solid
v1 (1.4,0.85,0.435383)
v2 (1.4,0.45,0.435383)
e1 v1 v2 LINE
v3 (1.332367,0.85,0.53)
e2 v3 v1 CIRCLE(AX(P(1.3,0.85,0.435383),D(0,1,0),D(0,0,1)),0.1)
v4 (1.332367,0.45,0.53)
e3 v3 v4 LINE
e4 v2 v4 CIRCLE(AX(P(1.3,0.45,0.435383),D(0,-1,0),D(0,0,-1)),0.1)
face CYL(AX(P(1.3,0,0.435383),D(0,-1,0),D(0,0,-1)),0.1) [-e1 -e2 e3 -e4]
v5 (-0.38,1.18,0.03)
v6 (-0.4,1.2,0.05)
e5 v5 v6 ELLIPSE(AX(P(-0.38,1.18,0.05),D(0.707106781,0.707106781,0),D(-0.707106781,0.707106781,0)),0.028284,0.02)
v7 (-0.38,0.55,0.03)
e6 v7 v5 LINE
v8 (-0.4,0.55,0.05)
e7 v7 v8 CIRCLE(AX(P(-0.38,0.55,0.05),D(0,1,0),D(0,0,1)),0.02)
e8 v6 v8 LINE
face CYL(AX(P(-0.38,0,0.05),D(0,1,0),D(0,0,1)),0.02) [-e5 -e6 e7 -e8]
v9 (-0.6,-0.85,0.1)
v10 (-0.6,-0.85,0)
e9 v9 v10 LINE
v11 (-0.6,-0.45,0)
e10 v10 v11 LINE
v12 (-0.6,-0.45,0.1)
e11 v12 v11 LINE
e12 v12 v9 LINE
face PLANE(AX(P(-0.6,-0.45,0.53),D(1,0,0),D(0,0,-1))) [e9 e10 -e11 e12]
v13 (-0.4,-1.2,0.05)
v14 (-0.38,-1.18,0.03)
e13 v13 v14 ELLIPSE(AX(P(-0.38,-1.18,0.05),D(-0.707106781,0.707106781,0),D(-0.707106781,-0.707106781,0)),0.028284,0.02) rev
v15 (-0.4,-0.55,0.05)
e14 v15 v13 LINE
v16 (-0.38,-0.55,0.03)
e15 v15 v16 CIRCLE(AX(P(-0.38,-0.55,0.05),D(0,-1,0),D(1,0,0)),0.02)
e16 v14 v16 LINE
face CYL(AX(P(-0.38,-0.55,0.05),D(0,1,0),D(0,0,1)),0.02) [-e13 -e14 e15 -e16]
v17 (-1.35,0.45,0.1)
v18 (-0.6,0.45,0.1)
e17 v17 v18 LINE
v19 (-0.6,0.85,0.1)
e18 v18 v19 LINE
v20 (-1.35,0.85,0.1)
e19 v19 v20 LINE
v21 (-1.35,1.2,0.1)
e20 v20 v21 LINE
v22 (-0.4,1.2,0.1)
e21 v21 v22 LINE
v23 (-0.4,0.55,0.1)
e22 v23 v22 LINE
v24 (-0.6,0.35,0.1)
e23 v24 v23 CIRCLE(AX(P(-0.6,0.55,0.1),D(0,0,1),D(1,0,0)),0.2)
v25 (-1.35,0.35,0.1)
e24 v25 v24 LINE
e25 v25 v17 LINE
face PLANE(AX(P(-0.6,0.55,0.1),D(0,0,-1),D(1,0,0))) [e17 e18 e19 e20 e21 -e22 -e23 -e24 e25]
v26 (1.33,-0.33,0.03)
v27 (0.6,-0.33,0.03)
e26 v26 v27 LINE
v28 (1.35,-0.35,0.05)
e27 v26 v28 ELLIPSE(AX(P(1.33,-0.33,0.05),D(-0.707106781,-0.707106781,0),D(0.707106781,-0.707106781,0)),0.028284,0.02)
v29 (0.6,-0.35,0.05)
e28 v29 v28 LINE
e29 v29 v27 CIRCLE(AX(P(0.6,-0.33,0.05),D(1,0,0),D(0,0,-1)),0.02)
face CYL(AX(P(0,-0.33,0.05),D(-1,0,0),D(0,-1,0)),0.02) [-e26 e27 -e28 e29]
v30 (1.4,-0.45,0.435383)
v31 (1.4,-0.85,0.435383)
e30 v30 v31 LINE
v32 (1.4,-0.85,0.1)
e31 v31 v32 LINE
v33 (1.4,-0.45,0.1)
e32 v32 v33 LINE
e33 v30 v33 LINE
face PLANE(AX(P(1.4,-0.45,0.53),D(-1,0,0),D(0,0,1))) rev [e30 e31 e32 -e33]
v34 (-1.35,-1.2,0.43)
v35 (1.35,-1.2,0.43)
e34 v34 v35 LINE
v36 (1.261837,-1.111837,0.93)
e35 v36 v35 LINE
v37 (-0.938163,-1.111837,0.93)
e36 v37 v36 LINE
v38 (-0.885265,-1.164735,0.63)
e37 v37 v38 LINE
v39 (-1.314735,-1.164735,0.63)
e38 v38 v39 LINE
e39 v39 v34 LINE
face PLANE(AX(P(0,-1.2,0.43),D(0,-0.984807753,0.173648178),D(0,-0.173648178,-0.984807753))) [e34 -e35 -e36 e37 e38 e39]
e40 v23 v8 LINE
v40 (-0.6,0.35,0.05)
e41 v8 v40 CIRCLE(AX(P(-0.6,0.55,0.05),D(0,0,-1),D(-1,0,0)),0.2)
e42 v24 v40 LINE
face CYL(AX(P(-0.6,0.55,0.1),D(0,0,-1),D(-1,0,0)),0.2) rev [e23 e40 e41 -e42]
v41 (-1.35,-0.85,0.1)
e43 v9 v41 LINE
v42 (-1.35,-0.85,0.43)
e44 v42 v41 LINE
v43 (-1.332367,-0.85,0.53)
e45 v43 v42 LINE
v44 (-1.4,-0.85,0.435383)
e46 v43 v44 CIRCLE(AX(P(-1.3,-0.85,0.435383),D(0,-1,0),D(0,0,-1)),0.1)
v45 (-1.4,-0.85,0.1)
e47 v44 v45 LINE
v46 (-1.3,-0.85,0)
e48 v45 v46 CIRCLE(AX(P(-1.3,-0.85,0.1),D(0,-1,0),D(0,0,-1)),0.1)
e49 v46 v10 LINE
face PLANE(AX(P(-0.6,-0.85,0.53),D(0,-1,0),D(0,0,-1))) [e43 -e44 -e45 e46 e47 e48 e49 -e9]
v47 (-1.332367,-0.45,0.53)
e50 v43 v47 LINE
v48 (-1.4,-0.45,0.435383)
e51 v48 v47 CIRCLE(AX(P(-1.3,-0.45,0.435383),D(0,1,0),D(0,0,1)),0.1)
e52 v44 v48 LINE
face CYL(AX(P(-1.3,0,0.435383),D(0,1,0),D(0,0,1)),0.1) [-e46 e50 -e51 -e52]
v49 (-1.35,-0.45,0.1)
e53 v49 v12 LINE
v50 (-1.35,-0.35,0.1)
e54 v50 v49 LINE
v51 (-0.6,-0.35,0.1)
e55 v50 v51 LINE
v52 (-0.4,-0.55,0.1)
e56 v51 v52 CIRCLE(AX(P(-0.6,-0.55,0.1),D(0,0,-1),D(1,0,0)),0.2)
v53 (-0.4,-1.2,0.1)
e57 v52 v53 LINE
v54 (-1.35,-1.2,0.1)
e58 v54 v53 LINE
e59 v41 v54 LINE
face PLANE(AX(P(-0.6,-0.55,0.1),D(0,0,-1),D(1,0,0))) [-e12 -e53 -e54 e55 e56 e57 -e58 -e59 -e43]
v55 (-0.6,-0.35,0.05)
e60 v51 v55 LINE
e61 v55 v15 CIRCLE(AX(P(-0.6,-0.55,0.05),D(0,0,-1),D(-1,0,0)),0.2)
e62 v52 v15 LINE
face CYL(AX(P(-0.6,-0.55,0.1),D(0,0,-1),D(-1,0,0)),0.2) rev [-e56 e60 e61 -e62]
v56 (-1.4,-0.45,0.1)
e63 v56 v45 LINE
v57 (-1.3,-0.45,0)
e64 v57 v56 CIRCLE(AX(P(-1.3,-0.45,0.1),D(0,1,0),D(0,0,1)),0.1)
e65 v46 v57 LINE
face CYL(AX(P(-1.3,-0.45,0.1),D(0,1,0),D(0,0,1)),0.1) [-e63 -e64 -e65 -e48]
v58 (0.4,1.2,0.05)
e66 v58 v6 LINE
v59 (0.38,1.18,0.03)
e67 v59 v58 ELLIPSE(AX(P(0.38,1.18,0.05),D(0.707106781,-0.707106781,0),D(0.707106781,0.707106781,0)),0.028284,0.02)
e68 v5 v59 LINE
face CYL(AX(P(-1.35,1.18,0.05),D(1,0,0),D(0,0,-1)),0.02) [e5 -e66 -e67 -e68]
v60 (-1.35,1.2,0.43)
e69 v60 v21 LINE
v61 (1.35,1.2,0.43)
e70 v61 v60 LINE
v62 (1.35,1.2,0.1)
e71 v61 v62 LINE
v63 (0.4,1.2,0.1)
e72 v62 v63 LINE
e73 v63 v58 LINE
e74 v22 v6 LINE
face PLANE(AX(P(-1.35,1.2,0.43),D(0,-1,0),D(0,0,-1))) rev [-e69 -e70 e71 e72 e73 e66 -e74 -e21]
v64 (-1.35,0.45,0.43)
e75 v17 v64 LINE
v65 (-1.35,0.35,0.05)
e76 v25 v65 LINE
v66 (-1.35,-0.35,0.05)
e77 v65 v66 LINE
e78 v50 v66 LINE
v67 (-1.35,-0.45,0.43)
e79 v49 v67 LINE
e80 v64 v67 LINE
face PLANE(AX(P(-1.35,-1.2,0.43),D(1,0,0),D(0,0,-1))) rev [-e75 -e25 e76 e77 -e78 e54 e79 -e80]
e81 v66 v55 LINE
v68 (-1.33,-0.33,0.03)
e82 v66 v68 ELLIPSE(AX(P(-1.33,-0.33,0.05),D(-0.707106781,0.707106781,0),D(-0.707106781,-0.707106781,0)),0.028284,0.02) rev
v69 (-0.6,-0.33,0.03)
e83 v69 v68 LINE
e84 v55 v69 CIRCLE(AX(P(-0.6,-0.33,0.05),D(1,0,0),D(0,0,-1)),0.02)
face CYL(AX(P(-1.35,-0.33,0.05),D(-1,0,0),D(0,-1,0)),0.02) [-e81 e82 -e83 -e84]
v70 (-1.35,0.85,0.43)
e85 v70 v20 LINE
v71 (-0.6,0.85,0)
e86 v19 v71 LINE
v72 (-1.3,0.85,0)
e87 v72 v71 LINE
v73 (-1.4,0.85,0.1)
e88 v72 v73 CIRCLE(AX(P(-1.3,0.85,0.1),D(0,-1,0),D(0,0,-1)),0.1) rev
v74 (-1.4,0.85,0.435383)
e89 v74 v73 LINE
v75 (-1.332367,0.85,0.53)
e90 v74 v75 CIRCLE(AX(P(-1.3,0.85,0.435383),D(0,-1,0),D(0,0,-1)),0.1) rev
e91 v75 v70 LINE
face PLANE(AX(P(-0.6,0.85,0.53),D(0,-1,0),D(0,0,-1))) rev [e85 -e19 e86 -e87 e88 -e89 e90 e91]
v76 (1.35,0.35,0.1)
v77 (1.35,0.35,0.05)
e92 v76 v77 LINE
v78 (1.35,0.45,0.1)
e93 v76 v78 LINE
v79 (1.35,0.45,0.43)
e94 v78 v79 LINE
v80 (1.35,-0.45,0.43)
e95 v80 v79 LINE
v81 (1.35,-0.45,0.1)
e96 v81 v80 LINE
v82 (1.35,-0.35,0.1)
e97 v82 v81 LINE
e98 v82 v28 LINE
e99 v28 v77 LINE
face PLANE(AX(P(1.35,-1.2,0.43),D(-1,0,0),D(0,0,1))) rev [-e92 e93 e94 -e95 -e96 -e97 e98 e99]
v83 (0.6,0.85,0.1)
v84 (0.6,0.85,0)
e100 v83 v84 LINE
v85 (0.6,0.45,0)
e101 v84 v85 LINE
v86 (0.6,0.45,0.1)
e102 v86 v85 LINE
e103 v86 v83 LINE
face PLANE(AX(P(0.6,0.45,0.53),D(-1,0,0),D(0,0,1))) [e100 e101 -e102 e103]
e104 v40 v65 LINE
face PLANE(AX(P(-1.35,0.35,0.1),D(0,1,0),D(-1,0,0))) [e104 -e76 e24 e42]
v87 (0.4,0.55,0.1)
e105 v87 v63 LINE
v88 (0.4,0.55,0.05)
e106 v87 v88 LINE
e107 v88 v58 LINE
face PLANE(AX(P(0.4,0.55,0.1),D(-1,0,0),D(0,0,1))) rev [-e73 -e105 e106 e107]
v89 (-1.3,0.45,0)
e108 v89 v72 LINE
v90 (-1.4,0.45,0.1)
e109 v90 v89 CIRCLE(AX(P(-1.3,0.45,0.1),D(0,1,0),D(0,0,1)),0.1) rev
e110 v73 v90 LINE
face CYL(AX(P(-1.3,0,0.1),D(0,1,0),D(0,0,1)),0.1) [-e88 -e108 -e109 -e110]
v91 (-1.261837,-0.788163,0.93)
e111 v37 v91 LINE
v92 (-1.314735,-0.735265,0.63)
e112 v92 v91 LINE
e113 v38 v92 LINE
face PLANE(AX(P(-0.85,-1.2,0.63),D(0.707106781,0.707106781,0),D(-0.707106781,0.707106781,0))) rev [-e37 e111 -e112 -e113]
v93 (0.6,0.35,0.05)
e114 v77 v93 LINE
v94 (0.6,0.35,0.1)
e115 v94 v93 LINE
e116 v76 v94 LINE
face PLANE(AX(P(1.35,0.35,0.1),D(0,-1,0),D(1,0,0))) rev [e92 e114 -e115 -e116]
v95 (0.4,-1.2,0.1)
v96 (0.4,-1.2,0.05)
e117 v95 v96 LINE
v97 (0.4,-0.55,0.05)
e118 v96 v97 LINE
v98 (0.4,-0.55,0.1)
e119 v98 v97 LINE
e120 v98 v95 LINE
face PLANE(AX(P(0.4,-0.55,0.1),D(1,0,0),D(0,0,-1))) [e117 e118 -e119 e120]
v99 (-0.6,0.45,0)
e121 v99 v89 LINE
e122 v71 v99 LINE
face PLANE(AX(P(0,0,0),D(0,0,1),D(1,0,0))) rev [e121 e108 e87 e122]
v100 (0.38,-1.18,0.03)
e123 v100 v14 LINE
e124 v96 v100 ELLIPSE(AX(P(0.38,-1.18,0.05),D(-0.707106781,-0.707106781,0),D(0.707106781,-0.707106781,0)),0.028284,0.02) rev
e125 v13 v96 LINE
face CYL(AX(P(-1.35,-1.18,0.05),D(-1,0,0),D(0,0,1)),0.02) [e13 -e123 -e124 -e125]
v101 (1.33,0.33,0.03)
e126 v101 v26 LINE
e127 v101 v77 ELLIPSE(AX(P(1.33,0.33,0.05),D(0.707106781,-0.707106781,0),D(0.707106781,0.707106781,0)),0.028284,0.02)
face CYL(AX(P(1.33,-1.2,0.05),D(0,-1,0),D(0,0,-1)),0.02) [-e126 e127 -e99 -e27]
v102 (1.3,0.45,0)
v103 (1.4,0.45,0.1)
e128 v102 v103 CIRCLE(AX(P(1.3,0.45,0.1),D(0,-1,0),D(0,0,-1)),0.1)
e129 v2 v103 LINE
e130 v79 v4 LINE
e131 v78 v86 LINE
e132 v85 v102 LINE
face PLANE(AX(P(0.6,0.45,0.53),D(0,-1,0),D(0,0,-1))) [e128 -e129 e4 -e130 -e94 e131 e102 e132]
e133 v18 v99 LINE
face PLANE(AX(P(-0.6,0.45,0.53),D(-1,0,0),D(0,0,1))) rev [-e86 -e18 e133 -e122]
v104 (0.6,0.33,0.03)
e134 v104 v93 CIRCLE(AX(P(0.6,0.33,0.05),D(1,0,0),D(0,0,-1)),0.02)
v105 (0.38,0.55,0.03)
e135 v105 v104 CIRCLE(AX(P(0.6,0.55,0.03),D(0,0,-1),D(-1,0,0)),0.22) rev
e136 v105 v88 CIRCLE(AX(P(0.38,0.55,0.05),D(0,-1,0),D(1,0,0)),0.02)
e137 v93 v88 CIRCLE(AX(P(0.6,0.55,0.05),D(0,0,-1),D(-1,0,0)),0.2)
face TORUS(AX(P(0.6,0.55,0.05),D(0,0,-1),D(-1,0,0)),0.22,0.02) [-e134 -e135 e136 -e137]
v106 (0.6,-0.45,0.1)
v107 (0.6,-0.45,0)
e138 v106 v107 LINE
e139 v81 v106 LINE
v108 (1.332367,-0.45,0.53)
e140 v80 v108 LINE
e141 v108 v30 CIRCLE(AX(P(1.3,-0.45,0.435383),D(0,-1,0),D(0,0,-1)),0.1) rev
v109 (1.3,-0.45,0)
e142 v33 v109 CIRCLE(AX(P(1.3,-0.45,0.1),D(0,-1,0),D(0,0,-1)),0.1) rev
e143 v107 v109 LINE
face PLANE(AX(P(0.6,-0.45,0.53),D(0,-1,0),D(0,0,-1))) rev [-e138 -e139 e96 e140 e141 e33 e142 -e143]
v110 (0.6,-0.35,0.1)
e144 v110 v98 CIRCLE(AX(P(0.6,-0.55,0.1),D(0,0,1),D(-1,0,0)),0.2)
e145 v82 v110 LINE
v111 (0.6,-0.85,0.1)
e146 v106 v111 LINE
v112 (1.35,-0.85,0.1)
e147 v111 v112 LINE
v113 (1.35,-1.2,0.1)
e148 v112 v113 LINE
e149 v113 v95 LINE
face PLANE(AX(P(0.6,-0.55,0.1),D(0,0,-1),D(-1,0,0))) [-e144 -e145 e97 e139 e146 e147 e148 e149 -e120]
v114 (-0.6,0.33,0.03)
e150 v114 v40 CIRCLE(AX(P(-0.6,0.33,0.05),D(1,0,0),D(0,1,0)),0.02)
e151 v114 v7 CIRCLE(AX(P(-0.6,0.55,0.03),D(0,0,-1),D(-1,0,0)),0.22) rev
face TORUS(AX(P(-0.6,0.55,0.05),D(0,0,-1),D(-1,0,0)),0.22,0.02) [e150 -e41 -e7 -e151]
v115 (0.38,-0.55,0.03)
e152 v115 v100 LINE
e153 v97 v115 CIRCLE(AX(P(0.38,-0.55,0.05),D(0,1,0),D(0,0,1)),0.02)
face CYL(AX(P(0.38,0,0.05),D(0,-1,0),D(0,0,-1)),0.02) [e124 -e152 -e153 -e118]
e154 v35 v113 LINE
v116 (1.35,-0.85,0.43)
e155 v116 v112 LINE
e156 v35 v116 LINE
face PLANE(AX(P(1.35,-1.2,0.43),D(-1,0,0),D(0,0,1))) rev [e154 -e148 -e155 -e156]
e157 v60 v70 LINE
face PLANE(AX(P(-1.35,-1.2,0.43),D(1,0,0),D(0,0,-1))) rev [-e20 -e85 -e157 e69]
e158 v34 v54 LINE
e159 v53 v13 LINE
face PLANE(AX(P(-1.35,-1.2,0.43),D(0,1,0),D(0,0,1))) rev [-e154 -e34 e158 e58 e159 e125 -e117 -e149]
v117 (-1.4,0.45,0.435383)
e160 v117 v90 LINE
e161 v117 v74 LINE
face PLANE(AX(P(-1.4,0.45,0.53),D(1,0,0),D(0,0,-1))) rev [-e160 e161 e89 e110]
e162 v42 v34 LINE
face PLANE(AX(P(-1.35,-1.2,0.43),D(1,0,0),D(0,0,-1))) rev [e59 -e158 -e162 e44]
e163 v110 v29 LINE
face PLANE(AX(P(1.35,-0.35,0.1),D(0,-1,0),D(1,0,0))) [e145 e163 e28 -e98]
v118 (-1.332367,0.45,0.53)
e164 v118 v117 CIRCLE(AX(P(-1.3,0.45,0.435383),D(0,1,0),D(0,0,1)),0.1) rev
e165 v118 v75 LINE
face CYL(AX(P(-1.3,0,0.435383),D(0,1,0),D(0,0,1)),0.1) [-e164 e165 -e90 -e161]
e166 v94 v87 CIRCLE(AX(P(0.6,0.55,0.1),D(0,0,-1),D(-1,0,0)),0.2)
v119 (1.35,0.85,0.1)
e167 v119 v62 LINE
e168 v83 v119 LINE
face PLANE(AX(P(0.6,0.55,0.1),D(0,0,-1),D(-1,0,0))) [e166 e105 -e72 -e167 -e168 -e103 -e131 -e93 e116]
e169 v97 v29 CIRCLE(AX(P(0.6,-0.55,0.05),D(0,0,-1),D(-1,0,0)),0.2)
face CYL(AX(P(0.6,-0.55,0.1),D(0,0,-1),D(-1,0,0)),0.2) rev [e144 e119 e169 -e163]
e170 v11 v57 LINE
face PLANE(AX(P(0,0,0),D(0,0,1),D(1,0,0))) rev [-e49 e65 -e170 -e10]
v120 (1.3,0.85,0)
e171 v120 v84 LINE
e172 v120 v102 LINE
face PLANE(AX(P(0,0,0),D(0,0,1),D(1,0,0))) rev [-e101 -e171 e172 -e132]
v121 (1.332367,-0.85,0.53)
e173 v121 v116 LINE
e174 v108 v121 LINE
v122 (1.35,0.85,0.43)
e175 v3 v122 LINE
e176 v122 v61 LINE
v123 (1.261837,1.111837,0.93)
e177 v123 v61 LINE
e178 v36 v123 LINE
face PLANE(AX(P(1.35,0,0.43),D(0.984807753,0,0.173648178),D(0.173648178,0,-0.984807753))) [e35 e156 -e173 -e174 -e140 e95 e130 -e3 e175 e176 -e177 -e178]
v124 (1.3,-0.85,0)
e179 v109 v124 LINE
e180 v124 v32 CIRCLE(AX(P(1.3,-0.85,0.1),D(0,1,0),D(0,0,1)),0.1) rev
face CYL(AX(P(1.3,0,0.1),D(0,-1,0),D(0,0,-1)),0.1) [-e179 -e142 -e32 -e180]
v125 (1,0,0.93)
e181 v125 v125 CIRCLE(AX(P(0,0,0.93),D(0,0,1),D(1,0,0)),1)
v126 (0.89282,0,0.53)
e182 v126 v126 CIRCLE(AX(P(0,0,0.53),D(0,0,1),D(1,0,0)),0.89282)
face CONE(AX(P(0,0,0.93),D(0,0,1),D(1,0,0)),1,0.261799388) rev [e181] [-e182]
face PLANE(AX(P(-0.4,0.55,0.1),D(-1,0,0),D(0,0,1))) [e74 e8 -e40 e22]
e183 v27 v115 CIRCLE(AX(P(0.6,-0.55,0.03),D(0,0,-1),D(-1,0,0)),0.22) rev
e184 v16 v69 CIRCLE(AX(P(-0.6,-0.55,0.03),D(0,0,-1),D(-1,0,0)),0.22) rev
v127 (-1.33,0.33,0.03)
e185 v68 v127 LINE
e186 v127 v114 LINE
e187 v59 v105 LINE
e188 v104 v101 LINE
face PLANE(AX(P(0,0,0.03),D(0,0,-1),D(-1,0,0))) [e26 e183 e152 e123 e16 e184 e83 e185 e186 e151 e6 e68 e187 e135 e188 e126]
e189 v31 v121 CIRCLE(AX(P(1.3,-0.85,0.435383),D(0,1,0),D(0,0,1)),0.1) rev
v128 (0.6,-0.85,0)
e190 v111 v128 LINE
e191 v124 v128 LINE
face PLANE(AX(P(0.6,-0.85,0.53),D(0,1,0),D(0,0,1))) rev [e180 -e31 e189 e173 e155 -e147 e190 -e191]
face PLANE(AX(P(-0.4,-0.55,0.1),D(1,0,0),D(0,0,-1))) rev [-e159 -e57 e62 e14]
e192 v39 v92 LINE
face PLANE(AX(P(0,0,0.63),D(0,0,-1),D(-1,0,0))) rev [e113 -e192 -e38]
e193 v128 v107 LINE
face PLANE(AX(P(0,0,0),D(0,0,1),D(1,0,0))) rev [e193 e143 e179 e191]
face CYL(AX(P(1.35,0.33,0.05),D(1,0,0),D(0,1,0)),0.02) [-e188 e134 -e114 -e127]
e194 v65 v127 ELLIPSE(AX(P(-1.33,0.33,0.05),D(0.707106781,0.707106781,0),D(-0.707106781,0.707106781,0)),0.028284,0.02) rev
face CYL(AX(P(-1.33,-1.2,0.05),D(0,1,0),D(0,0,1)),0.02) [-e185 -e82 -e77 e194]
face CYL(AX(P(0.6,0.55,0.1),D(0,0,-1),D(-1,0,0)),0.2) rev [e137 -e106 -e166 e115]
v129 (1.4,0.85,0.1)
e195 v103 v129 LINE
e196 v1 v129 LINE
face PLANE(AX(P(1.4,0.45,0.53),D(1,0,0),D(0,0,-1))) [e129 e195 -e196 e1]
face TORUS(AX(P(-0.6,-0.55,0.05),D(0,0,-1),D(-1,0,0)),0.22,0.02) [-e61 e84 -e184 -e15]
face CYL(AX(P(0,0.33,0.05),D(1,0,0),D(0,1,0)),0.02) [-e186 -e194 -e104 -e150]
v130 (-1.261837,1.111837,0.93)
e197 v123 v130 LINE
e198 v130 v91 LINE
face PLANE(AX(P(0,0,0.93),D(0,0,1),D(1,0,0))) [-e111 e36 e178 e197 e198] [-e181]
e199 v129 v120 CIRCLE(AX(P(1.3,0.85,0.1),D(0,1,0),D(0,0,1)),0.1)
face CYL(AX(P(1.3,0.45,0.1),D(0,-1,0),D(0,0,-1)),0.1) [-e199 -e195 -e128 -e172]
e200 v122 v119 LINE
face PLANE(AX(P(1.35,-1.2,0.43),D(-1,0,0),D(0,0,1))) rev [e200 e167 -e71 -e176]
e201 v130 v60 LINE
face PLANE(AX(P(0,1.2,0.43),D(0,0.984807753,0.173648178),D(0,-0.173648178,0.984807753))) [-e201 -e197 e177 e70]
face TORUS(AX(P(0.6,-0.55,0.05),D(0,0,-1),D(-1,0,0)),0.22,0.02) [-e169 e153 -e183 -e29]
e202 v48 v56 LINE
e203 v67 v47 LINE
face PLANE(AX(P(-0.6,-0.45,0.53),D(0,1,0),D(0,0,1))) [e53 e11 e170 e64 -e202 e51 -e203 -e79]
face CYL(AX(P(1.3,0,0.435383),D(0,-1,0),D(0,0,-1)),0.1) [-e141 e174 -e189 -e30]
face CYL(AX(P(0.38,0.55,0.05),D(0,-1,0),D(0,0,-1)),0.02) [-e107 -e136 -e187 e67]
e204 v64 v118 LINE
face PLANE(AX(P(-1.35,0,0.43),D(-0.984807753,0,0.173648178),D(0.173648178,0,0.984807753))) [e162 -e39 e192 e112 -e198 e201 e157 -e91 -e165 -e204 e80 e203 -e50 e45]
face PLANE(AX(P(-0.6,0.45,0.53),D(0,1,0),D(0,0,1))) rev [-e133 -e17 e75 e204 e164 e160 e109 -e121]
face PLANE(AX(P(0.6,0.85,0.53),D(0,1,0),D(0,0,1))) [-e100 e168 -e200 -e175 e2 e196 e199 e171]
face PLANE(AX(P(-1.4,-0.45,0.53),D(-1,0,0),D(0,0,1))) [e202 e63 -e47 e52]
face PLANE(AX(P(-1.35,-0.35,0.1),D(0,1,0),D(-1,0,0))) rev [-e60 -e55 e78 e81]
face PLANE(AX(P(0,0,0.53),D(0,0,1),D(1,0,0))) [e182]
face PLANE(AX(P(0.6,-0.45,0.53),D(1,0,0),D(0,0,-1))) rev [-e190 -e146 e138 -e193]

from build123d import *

# Parameters (mm, degrees)
BOSS_EXTRUDE1_START  = 0.03
SKETCH1_W            = 2.7
SKETCH1_H            = 2.4
BOSS_EXTRUDE1_DEPTH  = 0.4
BOSS_EXTRUDE2_START  = 0.43
SKETCH1_2_W          = 2.7
SKETCH1_2_H          = 2.4
BOSS_EXTRUDE2_DEPTH  = 0.5
BOSS_EXTRUDE2_TAPER  = 10
CUT_EXTRUDE1_DEPTH   = 0.3
SKETCH3_R            = 1
CUT_EXTRUDE2_DEPTH   = 0.4
CUT_EXTRUDE2_DRAFT   = -15
CUT_EXTRUDE3_DEPTH   = 0.07
BOSS_EXTRUDE3_START  = -0.5
SKETCH4_W            = 0.8
SKETCH4_H            = 0.4
BOSS_EXTRUDE3_DEPTH  = 0.53
FILLET2_R            = 0.1
MIRROR2_COPY_1_DEPTH = 0.07
FILLET1_R            = 0.02
FILLET2_OF_MIRROR3_R = 0.1
MIRROR4_START        = -0.85
MIRROR4_DEPTH        = 0.4


# Read off the part's stored shape, not the designer's step: Mirror4
with BuildPart() as part:
    # Sketch1 → Boss-Extrude1 (new body)
    with BuildSketch(Plane.XY.offset(BOSS_EXTRUDE1_START)):
        Rectangle(SKETCH1_W, SKETCH1_H)
    extrude(amount=BOSS_EXTRUDE1_DEPTH)

    # Sketch1<2> → Boss-Extrude2 (add)
    with BuildSketch(Plane.XY.offset(BOSS_EXTRUDE2_START)):
        Rectangle(SKETCH1_2_W, SKETCH1_2_H)
    extrude(amount=BOSS_EXTRUDE2_DEPTH, taper=BOSS_EXTRUDE2_TAPER)

    # Sketch2 → Cut-Extrude1 (cut)
    with BuildSketch(Plane.XY.offset(0.93)):
        Polygon((-0.85, -1.2), (-1.35, -0.7), (-1.35, -1.2), align=None)
    extrude(amount=-CUT_EXTRUDE1_DEPTH, mode=Mode.SUBTRACT)


with BuildPart() as cut_extrude2_tool:
    # Sketch3 → Cut-Extrude2 (with draft: the straight prism first)
    with BuildSketch(Plane.XY.offset(0.93)):
        Circle(SKETCH3_R)
    extrude(amount=-CUT_EXTRUDE2_DEPTH)
    # Cut-Extrude2: the draft: its side faces are tilted about the plane it starts from
    cut_extrude2_sides = [cut_extrude2_tool.faces().sort_by_distance(p)[0] for p in [
        (-1, 0, 0.73),
    ]]
    draft(cut_extrude2_sides, Plane.XY.offset(0.93), CUT_EXTRUDE2_DRAFT)


with BuildPart() as part_1:
    add(part.part)

    # Cut-Extrude2: cut by cut_extrude2_tool
    add(cut_extrude2_tool.part, mode=Mode.SUBTRACT)

    # Sketch5 → Cut-Extrude3 (cut)
    with BuildSketch(Plane(origin=(0, 0, 0.03), x_dir=(-1, 0, 0), z_dir=(0, 0, -1))):
        with BuildLine():
            Line((-1.35, 0.35), (-0.6, 0.35))
            ThreePointArc((-0.6, 0.35), (-0.458578644, 0.408578644), (-0.4, 0.55))
            Line((-0.4, 0.55), (-0.4, 1.2))
            Line((-0.4, 1.2), (-1.35, 1.2))
            Line((-1.35, 1.2), (-1.35, 0.35))
        make_face()
    cut_extrude3 = extrude(amount=-CUT_EXTRUDE3_DEPTH, mode=Mode.SUBTRACT)

    # Sketch4 → Boss-Extrude3 (add)
    with BuildSketch(Plane(origin=(0, 0, 0.03), x_dir=(-1, 0, 0), z_dir=(0, 0, -1)).offset(BOSS_EXTRUDE3_START)):
        with Locations((-1, 0.65)):
            Rectangle(SKETCH4_W, SKETCH4_H)
    boss_extrude3 = extrude(amount=BOSS_EXTRUDE3_DEPTH)

    # Fillet2
    # the kernel refuses this fillet: 0.1 mm, written as the material it takes off along each edge
    with BuildSketch(Plane(origin=(1.4, 0.21345775, 0.53), x_dir=(0, 0, -1), z_dir=(0, 1, 0))) as fillet2_piece_1:
        with BuildLine():
            CenterArc((0.0946169, 0.1), FILLET2_R, 198.885199637, 71.114800363)
            Line((0, 0.067632698), (-0.001892338, 0.066985352))
            ThreePointArc((-0.001892338, 0.066985352), (-0.002, 0.033816349), (-0.002, 0))
            Line((-0.002, 0), (0, -0.002))
            Line((0, -0.002), (0.0946169, -0.002))
            Line((0.0946169, -0.002), (0.0946169, 0))
        make_face()
    extrude(amount=0.8730845, mode=Mode.SUBTRACT)
    with BuildSketch(Plane(origin=(1.4, 0.2, 0), x_dir=(0, 0, 1), z_dir=(0, 1, 0))) as fillet2_piece_2:
        with BuildLine():
            CenterArc((FILLET2_R, -FILLET2_R), FILLET2_R, 90, 90)
            Line((0, -FILLET2_R), (-FILLET2_R * 0.02, -FILLET2_R))
            Line((-FILLET2_R * 0.02, -FILLET2_R), (-FILLET2_R * 0.02, FILLET2_R * 0.02))
            Line((-FILLET2_R * 0.02, FILLET2_R * 0.02), (FILLET2_R, FILLET2_R * 0.02))
            Line((FILLET2_R, FILLET2_R * 0.02), (FILLET2_R, 0))
        make_face()
    extrude(amount=0.9, mode=Mode.SUBTRACT)

    # Mirror1: Cut-Extrude3 across plane
    add(cut_extrude3.mirror(Plane(origin=(0, 0, 0), x_dir=(0, 0, 1), z_dir=(1, 0, 0))), mode=Mode.SUBTRACT)

    # Mirror2: Cut-Extrude3 across plane
    add(cut_extrude3.mirror(Plane.ZX), mode=Mode.SUBTRACT)

    # Mirror2 copy 1 sketch → Mirror2 copy 1 (cut)
    with BuildSketch(Plane(origin=(0, 0, 0.03), x_dir=(1, 0, 0), z_dir=(0, 0, -1))):
        with BuildLine():
            Line((-1.35, 0.35), (-0.6, 0.35))
            ThreePointArc((-0.6, 0.35), (-0.458578644, 0.408578644), (-0.4, 0.55))
            Line((-0.4, 0.55), (-0.4, 1.2))
            Line((-0.4, 1.2), (-1.35, 1.2))
            Line((-1.35, 1.2), (-1.35, 0.35))
        make_face()
    extrude(amount=-MIRROR2_COPY_1_DEPTH, mode=Mode.SUBTRACT)

    # Fillet1
    fillet1_edges = [part_1.edges().sort_by_distance(p)[0] for p in [
        (-1.35, 0, 0.03),
        (-0.458578644, 0.408578644, 0.03),
        (-0.4, 0.875, 0.03),
        (-0.975, 0.35, 0.03),
        (0, -1.2, 0.03),
        (-0.458578644, -0.408578644, 0.03),
        (-0.4, -0.875, 0.03),
        (-0.975, -0.35, 0.03),
        (1.35, 0, 0.03),
        (0.458578644, -0.408578644, 0.03),
        (0.4, -0.875, 0.03),
        (0.975, -0.35, 0.03),
        (0, 1.2, 0.03),
        (0.458578644, 0.408578644, 0.03),
        (0.4, 0.875, 0.03),
        (0.975, 0.35, 0.03),
    ]]
    fillet(fillet1_edges, radius=FILLET1_R)

    # Mirror3: Boss-Extrude3 across plane
    add(boss_extrude3.mirror(Plane(origin=(0, 0, 0), x_dir=(0, 0, 1), z_dir=(1, 0, 0))))

    # Fillet2 of Mirror3
    # the kernel refuses this fillet: 0.1 mm, written as the material it takes off along each edge
    with BuildSketch(Plane(origin=(-1.4, 0.21345775, 0.53), x_dir=(0, 0, -1), z_dir=(0, 1, 0))) as fillet2_of_mirror3_piece_1:
        with BuildLine():
            CenterArc((0.0946169, -0.1), FILLET2_OF_MIRROR3_R, 90, 71.114800363)
            Line((0, -0.067632698), (-0.001892338, -0.066985352))
            ThreePointArc((-0.001892338, -0.066985352), (-0.002, -0.033816349), (-0.002, 0))
            Line((-0.002, 0), (0, 0.002))
            Line((0, 0.002), (0.0946169, 0.002))
            Line((0.0946169, 0.002), (0.0946169, 0))
        make_face()
    extrude(amount=0.8730845, mode=Mode.SUBTRACT)
    with BuildSketch(Plane(origin=(-1.4, 0.2, 0), x_dir=(0, 0, 1), z_dir=(0, 1, 0))) as fillet2_of_mirror3_piece_2:
        with BuildLine():
            CenterArc((FILLET2_OF_MIRROR3_R, FILLET2_OF_MIRROR3_R), FILLET2_OF_MIRROR3_R, 180, 90)
            Line((0, FILLET2_OF_MIRROR3_R), (-FILLET2_OF_MIRROR3_R * 0.02, FILLET2_OF_MIRROR3_R))
            Line((-FILLET2_OF_MIRROR3_R * 0.02, FILLET2_OF_MIRROR3_R), (-FILLET2_OF_MIRROR3_R * 0.02, -FILLET2_OF_MIRROR3_R * 0.02))
            Line((-FILLET2_OF_MIRROR3_R * 0.02, -FILLET2_OF_MIRROR3_R * 0.02), (FILLET2_OF_MIRROR3_R, -FILLET2_OF_MIRROR3_R * 0.02))
            Line((FILLET2_OF_MIRROR3_R, -FILLET2_OF_MIRROR3_R * 0.02), (FILLET2_OF_MIRROR3_R, 0))
        make_face()
    extrude(amount=0.9, mode=Mode.SUBTRACT)

    # Mirror4 outline → Mirror4 (add)
    with BuildSketch(Plane(origin=(0, 0, 0), x_dir=(1, 0, 0), z_dir=(0, 1, 0)).offset(MIRROR4_START)):
        with BuildLine():
            Line((1.4, -0.4353831), (1.4, -0.1))
            ThreePointArc((1.4, -0.1), (1.370710678, -0.029289322), (1.3, 0))
            Line((1.3, 0), (0.6, 0))
            Line((0.6, 0), (0.6, -0.1))
            Line((0.6, -0.1), (1.35, -0.1))
            Line((1.35, -0.1), (1.35, -0.43))
            Line((1.35, -0.43), (1.332367302, -0.53))
            ThreePointArc((1.332367302, -0.53), (1.381353335, -0.493534926), (1.4, -0.4353831))
        make_face()
        with BuildLine():
            Line((-0.6, 0), (-1.3, 0))
            ThreePointArc((-1.3, 0), (-1.370710678, -0.029289322), (-1.4, -0.1))
            Line((-1.4, -0.1), (-1.4, -0.4353831))
            ThreePointArc((-1.4, -0.4353831), (-1.381353335, -0.493534926), (-1.332367302, -0.53))
            Line((-1.332367302, -0.53), (-1.35, -0.43))
            Line((-1.35, -0.43), (-1.35, -0.1))
            Line((-1.35, -0.1), (-0.6, -0.1))
            Line((-0.6, -0.1), (-0.6, 0))
        make_face()
    extrude(amount=MIRROR4_DEPTH)


solid = part_1.part
